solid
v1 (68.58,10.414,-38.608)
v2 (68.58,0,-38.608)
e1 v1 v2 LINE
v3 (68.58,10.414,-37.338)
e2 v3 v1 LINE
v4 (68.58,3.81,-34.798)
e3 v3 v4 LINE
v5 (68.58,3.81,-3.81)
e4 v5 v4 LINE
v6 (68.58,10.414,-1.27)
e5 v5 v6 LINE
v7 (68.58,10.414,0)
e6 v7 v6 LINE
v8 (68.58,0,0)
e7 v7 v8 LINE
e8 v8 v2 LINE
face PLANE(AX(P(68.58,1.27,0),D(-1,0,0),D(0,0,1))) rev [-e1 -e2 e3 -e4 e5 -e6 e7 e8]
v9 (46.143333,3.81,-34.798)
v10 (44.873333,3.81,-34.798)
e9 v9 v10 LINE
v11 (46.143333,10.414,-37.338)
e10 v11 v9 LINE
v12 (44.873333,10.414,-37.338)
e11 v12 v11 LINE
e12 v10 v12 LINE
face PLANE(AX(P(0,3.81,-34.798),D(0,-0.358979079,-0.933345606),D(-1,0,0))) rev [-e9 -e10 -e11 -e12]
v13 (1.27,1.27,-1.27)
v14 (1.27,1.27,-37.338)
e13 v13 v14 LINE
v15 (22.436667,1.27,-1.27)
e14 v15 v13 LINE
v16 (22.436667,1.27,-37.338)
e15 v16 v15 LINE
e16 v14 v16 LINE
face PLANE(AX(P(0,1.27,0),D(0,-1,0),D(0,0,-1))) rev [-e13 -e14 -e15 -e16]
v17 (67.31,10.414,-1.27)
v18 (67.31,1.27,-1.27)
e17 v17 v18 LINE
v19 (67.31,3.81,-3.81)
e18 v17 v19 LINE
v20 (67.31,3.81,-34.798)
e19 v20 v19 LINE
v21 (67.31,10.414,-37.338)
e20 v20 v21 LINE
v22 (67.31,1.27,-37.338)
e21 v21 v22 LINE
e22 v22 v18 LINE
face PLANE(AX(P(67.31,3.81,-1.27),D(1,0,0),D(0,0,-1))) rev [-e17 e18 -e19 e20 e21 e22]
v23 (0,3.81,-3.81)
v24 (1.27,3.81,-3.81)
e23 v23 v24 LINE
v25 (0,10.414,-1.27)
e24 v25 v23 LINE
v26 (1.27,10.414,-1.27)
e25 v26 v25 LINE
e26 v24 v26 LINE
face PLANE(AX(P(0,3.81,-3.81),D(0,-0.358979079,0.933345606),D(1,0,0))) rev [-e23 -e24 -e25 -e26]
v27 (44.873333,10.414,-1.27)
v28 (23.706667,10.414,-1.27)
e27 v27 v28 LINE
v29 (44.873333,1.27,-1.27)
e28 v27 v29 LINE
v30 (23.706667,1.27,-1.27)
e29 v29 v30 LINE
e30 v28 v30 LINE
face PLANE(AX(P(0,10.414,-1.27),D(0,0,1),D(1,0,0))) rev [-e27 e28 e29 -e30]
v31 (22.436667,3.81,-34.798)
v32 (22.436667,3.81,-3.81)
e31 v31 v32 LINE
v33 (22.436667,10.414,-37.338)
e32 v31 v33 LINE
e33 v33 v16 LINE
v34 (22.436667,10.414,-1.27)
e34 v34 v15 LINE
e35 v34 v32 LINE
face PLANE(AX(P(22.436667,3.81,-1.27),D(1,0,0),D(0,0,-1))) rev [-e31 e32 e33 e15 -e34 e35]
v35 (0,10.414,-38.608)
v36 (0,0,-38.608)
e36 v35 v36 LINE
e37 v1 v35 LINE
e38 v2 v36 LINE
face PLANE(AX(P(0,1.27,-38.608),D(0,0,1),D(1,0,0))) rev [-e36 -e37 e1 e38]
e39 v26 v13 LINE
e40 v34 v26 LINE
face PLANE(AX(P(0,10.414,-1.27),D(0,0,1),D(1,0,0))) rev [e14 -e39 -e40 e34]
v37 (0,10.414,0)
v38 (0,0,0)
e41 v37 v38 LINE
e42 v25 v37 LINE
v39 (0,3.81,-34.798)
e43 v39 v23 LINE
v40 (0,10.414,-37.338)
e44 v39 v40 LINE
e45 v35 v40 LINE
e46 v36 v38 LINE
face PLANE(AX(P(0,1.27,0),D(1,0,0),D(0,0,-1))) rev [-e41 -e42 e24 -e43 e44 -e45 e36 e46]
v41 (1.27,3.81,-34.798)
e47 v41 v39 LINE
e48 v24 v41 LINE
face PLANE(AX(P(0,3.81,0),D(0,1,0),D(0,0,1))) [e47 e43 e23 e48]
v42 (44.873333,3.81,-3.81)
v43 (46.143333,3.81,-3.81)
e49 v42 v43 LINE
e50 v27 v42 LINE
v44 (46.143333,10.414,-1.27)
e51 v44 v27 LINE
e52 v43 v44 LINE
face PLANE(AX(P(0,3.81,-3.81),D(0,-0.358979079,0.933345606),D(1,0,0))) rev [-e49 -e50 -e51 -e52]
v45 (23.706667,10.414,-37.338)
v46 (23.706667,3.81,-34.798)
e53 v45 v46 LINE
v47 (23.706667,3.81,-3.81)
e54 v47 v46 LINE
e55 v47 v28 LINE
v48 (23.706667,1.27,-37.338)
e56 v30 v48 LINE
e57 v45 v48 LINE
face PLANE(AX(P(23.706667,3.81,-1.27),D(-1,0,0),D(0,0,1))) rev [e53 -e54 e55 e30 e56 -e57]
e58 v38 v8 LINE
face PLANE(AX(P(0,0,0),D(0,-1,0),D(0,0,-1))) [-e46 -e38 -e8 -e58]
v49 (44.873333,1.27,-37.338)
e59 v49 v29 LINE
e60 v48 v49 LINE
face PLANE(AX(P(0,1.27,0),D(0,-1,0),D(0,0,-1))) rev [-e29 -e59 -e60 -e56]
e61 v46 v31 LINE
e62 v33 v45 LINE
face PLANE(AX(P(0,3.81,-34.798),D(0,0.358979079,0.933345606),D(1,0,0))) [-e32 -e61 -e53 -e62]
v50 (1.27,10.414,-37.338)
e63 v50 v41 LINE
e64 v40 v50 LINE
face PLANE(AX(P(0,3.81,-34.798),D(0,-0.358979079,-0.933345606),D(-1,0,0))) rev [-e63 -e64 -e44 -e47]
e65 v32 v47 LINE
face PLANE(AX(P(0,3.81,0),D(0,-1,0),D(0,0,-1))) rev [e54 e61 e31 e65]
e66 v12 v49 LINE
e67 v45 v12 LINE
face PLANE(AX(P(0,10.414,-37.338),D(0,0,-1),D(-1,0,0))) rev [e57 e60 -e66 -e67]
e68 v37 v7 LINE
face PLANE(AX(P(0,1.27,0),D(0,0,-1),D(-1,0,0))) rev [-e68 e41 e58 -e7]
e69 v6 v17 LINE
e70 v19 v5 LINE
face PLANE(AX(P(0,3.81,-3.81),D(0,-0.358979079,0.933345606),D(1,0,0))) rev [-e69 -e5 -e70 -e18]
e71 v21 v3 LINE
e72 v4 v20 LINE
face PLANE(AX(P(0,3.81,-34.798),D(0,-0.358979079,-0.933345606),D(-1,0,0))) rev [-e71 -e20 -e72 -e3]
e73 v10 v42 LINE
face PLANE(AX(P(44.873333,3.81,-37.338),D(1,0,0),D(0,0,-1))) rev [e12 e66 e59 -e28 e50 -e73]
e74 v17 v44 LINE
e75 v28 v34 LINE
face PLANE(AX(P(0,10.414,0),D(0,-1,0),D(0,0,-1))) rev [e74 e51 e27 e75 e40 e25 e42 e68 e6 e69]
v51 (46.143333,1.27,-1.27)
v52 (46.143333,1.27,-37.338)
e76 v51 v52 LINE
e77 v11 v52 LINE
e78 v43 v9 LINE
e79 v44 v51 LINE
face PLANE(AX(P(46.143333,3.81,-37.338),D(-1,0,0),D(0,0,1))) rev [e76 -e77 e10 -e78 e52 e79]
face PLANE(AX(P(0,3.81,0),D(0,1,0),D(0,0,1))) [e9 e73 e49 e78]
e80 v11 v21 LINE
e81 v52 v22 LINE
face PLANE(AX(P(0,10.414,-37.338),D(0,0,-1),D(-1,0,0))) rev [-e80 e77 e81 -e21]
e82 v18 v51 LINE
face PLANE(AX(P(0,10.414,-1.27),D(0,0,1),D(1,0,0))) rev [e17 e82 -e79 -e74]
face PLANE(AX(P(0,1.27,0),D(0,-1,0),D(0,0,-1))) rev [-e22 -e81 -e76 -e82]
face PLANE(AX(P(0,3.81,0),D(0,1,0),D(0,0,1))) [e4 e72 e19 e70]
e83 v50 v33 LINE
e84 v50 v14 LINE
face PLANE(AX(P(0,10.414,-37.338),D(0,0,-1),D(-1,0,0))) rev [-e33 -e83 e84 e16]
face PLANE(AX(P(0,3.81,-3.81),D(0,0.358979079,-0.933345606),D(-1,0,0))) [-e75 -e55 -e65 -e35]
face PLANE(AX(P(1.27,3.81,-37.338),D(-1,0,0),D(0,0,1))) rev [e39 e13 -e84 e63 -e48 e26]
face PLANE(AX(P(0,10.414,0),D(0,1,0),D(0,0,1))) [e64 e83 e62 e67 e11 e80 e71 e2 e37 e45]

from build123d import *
from OCP.BRepFilletAPI import BRepFilletAPI_MakeChamfer

# Parameters (mm, degrees)
SKETCH1_W           = 68.58
SKETCH1_H           = 38.608
BOSS_EXTRUDE1_DEPTH = 1.27
SKETCH2_W           = 68.58
SKETCH2_H           = 1.27
BOSS_EXTRUDE2_DEPTH = 9.144
SKETCH4_W           = 1.27
SKETCH4_H           = 36.068
BOSS_EXTRUDE4_DEPTH = 2.54
CHAMFER2_SIZE       = 6.604
CHAMFER2_SIZE_2     = 2.540000001


with BuildPart() as part:
    # Sketch1 → Boss-Extrude1 (new body)
    with BuildSketch(Plane(origin=(0, 0, 0), x_dir=(1, 0, 0), z_dir=(0, 1, 0))):
        with Locations((34.29, 19.304)):
            Rectangle(SKETCH1_W, SKETCH1_H)
    extrude(amount=BOSS_EXTRUDE1_DEPTH)

    # Sketch2 → Boss-Extrude2 (add)
    with BuildSketch(Plane(origin=(0, 1.27, 0), x_dir=(1, 0, 0), z_dir=(0, 1, 0))):
        with Locations((34.29, 37.973)):
            Rectangle(SKETCH2_W, SKETCH2_H)
        with Locations((34.29, 0.635)):
            Rectangle(SKETCH2_W, SKETCH2_H)
    extrude(amount=BOSS_EXTRUDE2_DEPTH)

    # Sketch4 → Boss-Extrude4 (add)
    with BuildSketch(Plane(origin=(0, 1.27, 0), x_dir=(1, 0, 0), z_dir=(0, 1, 0))):
        with Locations((0.635, 19.304)):
            Rectangle(SKETCH4_W, SKETCH4_H)
        with Locations((23.071666667, 19.304)):
            Rectangle(SKETCH4_W, SKETCH4_H)
        with Locations((45.508333333, 19.304)):
            Rectangle(SKETCH4_W, SKETCH4_H)
        with Locations((67.945, 19.304)):
            Rectangle(SKETCH4_W, SKETCH4_H)
    extrude(amount=BOSS_EXTRUDE4_DEPTH)

    # Chamfer2
    chamfer2_edges_1 = [part.edges().sort_by_distance(p)[0] for p in [
        (67.945, 3.81, -37.338),
    ]]
    chamfer2_side_1 = [part.faces().sort_by_distance(p)[0] for p in [
        (67.945, 3.8608, -37.338),
    ]]
    chamfer2_edges_2 = [part.edges().sort_by_distance(p)[0] for p in [
        (45.508333333, 3.81, -37.338),
    ]]
    chamfer2_side_2 = [part.faces().sort_by_distance(p)[0] for p in [
        (45.508333333, 3.8608, -37.338),
    ]]
    chamfer2_edges_3 = [part.edges().sort_by_distance(p)[0] for p in [
        (23.071666667, 3.81, -37.338),
    ]]
    chamfer2_side_3 = [part.faces().sort_by_distance(p)[0] for p in [
        (23.071666667, 3.8608, -37.338),
    ]]
    chamfer2_edges_4 = [part.edges().sort_by_distance(p)[0] for p in [
        (0.635, 3.81, -37.338),
    ]]
    chamfer2_side_4 = [part.faces().sort_by_distance(p)[0] for p in [
        (0.635, 3.8608, -37.338),
    ]]
    chamfer2_edges_5 = [part.edges().sort_by_distance(p)[0] for p in [
        (67.945, 3.81, -1.27),
    ]]
    chamfer2_side_5 = [part.faces().sort_by_distance(p)[0] for p in [
        (67.945, 3.8608, -1.27),
    ]]
    chamfer2_edges_6 = [part.edges().sort_by_distance(p)[0] for p in [
        (45.508333333, 3.81, -1.27),
    ]]
    chamfer2_side_6 = [part.faces().sort_by_distance(p)[0] for p in [
        (45.508333333, 3.8608, -1.27),
    ]]
    chamfer2_edges_7 = [part.edges().sort_by_distance(p)[0] for p in [
        (23.071666667, 3.81, -1.27),
    ]]
    chamfer2_side_7 = [part.faces().sort_by_distance(p)[0] for p in [
        (23.071666667, 3.8608, -1.27),
    ]]
    chamfer2_edges_8 = [part.edges().sort_by_distance(p)[0] for p in [
        (0.635, 3.81, -1.27),
    ]]
    chamfer2_side_8 = [part.faces().sort_by_distance(p)[0] for p in [
        (0.635, 3.8608, -1.27),
    ]]
    chamfer2 = BRepFilletAPI_MakeChamfer(part.part.solid().wrapped)
    for e in chamfer2_edges_1:
        chamfer2.Add(CHAMFER2_SIZE - 0.0001, CHAMFER2_SIZE_2 - 0.0001, e.wrapped, chamfer2_side_1[0].wrapped)
    for e in chamfer2_edges_2:
        chamfer2.Add(CHAMFER2_SIZE - 0.0001, CHAMFER2_SIZE_2 - 0.0001, e.wrapped, chamfer2_side_2[0].wrapped)
    for e in chamfer2_edges_3:
        chamfer2.Add(CHAMFER2_SIZE - 0.0001, CHAMFER2_SIZE_2 - 0.0001, e.wrapped, chamfer2_side_3[0].wrapped)
    for e in chamfer2_edges_4:
        chamfer2.Add(CHAMFER2_SIZE - 0.0001, CHAMFER2_SIZE_2 - 0.0001, e.wrapped, chamfer2_side_4[0].wrapped)
    for e in chamfer2_edges_5:
        chamfer2.Add(CHAMFER2_SIZE - 0.0001, CHAMFER2_SIZE_2 - 0.0001, e.wrapped, chamfer2_side_5[0].wrapped)
    for e in chamfer2_edges_6:
        chamfer2.Add(CHAMFER2_SIZE - 0.0001, CHAMFER2_SIZE_2 - 0.0001, e.wrapped, chamfer2_side_6[0].wrapped)
    for e in chamfer2_edges_7:
        chamfer2.Add(CHAMFER2_SIZE - 0.0001, CHAMFER2_SIZE_2 - 0.0001, e.wrapped, chamfer2_side_7[0].wrapped)
    for e in chamfer2_edges_8:
        chamfer2.Add(CHAMFER2_SIZE - 0.0001, CHAMFER2_SIZE_2 - 0.0001, e.wrapped, chamfer2_side_8[0].wrapped)
    add(Compound.cast(chamfer2.Shape()), mode=Mode.REPLACE)  # a hair under: the kernel refuses the full size


solid = part.part
